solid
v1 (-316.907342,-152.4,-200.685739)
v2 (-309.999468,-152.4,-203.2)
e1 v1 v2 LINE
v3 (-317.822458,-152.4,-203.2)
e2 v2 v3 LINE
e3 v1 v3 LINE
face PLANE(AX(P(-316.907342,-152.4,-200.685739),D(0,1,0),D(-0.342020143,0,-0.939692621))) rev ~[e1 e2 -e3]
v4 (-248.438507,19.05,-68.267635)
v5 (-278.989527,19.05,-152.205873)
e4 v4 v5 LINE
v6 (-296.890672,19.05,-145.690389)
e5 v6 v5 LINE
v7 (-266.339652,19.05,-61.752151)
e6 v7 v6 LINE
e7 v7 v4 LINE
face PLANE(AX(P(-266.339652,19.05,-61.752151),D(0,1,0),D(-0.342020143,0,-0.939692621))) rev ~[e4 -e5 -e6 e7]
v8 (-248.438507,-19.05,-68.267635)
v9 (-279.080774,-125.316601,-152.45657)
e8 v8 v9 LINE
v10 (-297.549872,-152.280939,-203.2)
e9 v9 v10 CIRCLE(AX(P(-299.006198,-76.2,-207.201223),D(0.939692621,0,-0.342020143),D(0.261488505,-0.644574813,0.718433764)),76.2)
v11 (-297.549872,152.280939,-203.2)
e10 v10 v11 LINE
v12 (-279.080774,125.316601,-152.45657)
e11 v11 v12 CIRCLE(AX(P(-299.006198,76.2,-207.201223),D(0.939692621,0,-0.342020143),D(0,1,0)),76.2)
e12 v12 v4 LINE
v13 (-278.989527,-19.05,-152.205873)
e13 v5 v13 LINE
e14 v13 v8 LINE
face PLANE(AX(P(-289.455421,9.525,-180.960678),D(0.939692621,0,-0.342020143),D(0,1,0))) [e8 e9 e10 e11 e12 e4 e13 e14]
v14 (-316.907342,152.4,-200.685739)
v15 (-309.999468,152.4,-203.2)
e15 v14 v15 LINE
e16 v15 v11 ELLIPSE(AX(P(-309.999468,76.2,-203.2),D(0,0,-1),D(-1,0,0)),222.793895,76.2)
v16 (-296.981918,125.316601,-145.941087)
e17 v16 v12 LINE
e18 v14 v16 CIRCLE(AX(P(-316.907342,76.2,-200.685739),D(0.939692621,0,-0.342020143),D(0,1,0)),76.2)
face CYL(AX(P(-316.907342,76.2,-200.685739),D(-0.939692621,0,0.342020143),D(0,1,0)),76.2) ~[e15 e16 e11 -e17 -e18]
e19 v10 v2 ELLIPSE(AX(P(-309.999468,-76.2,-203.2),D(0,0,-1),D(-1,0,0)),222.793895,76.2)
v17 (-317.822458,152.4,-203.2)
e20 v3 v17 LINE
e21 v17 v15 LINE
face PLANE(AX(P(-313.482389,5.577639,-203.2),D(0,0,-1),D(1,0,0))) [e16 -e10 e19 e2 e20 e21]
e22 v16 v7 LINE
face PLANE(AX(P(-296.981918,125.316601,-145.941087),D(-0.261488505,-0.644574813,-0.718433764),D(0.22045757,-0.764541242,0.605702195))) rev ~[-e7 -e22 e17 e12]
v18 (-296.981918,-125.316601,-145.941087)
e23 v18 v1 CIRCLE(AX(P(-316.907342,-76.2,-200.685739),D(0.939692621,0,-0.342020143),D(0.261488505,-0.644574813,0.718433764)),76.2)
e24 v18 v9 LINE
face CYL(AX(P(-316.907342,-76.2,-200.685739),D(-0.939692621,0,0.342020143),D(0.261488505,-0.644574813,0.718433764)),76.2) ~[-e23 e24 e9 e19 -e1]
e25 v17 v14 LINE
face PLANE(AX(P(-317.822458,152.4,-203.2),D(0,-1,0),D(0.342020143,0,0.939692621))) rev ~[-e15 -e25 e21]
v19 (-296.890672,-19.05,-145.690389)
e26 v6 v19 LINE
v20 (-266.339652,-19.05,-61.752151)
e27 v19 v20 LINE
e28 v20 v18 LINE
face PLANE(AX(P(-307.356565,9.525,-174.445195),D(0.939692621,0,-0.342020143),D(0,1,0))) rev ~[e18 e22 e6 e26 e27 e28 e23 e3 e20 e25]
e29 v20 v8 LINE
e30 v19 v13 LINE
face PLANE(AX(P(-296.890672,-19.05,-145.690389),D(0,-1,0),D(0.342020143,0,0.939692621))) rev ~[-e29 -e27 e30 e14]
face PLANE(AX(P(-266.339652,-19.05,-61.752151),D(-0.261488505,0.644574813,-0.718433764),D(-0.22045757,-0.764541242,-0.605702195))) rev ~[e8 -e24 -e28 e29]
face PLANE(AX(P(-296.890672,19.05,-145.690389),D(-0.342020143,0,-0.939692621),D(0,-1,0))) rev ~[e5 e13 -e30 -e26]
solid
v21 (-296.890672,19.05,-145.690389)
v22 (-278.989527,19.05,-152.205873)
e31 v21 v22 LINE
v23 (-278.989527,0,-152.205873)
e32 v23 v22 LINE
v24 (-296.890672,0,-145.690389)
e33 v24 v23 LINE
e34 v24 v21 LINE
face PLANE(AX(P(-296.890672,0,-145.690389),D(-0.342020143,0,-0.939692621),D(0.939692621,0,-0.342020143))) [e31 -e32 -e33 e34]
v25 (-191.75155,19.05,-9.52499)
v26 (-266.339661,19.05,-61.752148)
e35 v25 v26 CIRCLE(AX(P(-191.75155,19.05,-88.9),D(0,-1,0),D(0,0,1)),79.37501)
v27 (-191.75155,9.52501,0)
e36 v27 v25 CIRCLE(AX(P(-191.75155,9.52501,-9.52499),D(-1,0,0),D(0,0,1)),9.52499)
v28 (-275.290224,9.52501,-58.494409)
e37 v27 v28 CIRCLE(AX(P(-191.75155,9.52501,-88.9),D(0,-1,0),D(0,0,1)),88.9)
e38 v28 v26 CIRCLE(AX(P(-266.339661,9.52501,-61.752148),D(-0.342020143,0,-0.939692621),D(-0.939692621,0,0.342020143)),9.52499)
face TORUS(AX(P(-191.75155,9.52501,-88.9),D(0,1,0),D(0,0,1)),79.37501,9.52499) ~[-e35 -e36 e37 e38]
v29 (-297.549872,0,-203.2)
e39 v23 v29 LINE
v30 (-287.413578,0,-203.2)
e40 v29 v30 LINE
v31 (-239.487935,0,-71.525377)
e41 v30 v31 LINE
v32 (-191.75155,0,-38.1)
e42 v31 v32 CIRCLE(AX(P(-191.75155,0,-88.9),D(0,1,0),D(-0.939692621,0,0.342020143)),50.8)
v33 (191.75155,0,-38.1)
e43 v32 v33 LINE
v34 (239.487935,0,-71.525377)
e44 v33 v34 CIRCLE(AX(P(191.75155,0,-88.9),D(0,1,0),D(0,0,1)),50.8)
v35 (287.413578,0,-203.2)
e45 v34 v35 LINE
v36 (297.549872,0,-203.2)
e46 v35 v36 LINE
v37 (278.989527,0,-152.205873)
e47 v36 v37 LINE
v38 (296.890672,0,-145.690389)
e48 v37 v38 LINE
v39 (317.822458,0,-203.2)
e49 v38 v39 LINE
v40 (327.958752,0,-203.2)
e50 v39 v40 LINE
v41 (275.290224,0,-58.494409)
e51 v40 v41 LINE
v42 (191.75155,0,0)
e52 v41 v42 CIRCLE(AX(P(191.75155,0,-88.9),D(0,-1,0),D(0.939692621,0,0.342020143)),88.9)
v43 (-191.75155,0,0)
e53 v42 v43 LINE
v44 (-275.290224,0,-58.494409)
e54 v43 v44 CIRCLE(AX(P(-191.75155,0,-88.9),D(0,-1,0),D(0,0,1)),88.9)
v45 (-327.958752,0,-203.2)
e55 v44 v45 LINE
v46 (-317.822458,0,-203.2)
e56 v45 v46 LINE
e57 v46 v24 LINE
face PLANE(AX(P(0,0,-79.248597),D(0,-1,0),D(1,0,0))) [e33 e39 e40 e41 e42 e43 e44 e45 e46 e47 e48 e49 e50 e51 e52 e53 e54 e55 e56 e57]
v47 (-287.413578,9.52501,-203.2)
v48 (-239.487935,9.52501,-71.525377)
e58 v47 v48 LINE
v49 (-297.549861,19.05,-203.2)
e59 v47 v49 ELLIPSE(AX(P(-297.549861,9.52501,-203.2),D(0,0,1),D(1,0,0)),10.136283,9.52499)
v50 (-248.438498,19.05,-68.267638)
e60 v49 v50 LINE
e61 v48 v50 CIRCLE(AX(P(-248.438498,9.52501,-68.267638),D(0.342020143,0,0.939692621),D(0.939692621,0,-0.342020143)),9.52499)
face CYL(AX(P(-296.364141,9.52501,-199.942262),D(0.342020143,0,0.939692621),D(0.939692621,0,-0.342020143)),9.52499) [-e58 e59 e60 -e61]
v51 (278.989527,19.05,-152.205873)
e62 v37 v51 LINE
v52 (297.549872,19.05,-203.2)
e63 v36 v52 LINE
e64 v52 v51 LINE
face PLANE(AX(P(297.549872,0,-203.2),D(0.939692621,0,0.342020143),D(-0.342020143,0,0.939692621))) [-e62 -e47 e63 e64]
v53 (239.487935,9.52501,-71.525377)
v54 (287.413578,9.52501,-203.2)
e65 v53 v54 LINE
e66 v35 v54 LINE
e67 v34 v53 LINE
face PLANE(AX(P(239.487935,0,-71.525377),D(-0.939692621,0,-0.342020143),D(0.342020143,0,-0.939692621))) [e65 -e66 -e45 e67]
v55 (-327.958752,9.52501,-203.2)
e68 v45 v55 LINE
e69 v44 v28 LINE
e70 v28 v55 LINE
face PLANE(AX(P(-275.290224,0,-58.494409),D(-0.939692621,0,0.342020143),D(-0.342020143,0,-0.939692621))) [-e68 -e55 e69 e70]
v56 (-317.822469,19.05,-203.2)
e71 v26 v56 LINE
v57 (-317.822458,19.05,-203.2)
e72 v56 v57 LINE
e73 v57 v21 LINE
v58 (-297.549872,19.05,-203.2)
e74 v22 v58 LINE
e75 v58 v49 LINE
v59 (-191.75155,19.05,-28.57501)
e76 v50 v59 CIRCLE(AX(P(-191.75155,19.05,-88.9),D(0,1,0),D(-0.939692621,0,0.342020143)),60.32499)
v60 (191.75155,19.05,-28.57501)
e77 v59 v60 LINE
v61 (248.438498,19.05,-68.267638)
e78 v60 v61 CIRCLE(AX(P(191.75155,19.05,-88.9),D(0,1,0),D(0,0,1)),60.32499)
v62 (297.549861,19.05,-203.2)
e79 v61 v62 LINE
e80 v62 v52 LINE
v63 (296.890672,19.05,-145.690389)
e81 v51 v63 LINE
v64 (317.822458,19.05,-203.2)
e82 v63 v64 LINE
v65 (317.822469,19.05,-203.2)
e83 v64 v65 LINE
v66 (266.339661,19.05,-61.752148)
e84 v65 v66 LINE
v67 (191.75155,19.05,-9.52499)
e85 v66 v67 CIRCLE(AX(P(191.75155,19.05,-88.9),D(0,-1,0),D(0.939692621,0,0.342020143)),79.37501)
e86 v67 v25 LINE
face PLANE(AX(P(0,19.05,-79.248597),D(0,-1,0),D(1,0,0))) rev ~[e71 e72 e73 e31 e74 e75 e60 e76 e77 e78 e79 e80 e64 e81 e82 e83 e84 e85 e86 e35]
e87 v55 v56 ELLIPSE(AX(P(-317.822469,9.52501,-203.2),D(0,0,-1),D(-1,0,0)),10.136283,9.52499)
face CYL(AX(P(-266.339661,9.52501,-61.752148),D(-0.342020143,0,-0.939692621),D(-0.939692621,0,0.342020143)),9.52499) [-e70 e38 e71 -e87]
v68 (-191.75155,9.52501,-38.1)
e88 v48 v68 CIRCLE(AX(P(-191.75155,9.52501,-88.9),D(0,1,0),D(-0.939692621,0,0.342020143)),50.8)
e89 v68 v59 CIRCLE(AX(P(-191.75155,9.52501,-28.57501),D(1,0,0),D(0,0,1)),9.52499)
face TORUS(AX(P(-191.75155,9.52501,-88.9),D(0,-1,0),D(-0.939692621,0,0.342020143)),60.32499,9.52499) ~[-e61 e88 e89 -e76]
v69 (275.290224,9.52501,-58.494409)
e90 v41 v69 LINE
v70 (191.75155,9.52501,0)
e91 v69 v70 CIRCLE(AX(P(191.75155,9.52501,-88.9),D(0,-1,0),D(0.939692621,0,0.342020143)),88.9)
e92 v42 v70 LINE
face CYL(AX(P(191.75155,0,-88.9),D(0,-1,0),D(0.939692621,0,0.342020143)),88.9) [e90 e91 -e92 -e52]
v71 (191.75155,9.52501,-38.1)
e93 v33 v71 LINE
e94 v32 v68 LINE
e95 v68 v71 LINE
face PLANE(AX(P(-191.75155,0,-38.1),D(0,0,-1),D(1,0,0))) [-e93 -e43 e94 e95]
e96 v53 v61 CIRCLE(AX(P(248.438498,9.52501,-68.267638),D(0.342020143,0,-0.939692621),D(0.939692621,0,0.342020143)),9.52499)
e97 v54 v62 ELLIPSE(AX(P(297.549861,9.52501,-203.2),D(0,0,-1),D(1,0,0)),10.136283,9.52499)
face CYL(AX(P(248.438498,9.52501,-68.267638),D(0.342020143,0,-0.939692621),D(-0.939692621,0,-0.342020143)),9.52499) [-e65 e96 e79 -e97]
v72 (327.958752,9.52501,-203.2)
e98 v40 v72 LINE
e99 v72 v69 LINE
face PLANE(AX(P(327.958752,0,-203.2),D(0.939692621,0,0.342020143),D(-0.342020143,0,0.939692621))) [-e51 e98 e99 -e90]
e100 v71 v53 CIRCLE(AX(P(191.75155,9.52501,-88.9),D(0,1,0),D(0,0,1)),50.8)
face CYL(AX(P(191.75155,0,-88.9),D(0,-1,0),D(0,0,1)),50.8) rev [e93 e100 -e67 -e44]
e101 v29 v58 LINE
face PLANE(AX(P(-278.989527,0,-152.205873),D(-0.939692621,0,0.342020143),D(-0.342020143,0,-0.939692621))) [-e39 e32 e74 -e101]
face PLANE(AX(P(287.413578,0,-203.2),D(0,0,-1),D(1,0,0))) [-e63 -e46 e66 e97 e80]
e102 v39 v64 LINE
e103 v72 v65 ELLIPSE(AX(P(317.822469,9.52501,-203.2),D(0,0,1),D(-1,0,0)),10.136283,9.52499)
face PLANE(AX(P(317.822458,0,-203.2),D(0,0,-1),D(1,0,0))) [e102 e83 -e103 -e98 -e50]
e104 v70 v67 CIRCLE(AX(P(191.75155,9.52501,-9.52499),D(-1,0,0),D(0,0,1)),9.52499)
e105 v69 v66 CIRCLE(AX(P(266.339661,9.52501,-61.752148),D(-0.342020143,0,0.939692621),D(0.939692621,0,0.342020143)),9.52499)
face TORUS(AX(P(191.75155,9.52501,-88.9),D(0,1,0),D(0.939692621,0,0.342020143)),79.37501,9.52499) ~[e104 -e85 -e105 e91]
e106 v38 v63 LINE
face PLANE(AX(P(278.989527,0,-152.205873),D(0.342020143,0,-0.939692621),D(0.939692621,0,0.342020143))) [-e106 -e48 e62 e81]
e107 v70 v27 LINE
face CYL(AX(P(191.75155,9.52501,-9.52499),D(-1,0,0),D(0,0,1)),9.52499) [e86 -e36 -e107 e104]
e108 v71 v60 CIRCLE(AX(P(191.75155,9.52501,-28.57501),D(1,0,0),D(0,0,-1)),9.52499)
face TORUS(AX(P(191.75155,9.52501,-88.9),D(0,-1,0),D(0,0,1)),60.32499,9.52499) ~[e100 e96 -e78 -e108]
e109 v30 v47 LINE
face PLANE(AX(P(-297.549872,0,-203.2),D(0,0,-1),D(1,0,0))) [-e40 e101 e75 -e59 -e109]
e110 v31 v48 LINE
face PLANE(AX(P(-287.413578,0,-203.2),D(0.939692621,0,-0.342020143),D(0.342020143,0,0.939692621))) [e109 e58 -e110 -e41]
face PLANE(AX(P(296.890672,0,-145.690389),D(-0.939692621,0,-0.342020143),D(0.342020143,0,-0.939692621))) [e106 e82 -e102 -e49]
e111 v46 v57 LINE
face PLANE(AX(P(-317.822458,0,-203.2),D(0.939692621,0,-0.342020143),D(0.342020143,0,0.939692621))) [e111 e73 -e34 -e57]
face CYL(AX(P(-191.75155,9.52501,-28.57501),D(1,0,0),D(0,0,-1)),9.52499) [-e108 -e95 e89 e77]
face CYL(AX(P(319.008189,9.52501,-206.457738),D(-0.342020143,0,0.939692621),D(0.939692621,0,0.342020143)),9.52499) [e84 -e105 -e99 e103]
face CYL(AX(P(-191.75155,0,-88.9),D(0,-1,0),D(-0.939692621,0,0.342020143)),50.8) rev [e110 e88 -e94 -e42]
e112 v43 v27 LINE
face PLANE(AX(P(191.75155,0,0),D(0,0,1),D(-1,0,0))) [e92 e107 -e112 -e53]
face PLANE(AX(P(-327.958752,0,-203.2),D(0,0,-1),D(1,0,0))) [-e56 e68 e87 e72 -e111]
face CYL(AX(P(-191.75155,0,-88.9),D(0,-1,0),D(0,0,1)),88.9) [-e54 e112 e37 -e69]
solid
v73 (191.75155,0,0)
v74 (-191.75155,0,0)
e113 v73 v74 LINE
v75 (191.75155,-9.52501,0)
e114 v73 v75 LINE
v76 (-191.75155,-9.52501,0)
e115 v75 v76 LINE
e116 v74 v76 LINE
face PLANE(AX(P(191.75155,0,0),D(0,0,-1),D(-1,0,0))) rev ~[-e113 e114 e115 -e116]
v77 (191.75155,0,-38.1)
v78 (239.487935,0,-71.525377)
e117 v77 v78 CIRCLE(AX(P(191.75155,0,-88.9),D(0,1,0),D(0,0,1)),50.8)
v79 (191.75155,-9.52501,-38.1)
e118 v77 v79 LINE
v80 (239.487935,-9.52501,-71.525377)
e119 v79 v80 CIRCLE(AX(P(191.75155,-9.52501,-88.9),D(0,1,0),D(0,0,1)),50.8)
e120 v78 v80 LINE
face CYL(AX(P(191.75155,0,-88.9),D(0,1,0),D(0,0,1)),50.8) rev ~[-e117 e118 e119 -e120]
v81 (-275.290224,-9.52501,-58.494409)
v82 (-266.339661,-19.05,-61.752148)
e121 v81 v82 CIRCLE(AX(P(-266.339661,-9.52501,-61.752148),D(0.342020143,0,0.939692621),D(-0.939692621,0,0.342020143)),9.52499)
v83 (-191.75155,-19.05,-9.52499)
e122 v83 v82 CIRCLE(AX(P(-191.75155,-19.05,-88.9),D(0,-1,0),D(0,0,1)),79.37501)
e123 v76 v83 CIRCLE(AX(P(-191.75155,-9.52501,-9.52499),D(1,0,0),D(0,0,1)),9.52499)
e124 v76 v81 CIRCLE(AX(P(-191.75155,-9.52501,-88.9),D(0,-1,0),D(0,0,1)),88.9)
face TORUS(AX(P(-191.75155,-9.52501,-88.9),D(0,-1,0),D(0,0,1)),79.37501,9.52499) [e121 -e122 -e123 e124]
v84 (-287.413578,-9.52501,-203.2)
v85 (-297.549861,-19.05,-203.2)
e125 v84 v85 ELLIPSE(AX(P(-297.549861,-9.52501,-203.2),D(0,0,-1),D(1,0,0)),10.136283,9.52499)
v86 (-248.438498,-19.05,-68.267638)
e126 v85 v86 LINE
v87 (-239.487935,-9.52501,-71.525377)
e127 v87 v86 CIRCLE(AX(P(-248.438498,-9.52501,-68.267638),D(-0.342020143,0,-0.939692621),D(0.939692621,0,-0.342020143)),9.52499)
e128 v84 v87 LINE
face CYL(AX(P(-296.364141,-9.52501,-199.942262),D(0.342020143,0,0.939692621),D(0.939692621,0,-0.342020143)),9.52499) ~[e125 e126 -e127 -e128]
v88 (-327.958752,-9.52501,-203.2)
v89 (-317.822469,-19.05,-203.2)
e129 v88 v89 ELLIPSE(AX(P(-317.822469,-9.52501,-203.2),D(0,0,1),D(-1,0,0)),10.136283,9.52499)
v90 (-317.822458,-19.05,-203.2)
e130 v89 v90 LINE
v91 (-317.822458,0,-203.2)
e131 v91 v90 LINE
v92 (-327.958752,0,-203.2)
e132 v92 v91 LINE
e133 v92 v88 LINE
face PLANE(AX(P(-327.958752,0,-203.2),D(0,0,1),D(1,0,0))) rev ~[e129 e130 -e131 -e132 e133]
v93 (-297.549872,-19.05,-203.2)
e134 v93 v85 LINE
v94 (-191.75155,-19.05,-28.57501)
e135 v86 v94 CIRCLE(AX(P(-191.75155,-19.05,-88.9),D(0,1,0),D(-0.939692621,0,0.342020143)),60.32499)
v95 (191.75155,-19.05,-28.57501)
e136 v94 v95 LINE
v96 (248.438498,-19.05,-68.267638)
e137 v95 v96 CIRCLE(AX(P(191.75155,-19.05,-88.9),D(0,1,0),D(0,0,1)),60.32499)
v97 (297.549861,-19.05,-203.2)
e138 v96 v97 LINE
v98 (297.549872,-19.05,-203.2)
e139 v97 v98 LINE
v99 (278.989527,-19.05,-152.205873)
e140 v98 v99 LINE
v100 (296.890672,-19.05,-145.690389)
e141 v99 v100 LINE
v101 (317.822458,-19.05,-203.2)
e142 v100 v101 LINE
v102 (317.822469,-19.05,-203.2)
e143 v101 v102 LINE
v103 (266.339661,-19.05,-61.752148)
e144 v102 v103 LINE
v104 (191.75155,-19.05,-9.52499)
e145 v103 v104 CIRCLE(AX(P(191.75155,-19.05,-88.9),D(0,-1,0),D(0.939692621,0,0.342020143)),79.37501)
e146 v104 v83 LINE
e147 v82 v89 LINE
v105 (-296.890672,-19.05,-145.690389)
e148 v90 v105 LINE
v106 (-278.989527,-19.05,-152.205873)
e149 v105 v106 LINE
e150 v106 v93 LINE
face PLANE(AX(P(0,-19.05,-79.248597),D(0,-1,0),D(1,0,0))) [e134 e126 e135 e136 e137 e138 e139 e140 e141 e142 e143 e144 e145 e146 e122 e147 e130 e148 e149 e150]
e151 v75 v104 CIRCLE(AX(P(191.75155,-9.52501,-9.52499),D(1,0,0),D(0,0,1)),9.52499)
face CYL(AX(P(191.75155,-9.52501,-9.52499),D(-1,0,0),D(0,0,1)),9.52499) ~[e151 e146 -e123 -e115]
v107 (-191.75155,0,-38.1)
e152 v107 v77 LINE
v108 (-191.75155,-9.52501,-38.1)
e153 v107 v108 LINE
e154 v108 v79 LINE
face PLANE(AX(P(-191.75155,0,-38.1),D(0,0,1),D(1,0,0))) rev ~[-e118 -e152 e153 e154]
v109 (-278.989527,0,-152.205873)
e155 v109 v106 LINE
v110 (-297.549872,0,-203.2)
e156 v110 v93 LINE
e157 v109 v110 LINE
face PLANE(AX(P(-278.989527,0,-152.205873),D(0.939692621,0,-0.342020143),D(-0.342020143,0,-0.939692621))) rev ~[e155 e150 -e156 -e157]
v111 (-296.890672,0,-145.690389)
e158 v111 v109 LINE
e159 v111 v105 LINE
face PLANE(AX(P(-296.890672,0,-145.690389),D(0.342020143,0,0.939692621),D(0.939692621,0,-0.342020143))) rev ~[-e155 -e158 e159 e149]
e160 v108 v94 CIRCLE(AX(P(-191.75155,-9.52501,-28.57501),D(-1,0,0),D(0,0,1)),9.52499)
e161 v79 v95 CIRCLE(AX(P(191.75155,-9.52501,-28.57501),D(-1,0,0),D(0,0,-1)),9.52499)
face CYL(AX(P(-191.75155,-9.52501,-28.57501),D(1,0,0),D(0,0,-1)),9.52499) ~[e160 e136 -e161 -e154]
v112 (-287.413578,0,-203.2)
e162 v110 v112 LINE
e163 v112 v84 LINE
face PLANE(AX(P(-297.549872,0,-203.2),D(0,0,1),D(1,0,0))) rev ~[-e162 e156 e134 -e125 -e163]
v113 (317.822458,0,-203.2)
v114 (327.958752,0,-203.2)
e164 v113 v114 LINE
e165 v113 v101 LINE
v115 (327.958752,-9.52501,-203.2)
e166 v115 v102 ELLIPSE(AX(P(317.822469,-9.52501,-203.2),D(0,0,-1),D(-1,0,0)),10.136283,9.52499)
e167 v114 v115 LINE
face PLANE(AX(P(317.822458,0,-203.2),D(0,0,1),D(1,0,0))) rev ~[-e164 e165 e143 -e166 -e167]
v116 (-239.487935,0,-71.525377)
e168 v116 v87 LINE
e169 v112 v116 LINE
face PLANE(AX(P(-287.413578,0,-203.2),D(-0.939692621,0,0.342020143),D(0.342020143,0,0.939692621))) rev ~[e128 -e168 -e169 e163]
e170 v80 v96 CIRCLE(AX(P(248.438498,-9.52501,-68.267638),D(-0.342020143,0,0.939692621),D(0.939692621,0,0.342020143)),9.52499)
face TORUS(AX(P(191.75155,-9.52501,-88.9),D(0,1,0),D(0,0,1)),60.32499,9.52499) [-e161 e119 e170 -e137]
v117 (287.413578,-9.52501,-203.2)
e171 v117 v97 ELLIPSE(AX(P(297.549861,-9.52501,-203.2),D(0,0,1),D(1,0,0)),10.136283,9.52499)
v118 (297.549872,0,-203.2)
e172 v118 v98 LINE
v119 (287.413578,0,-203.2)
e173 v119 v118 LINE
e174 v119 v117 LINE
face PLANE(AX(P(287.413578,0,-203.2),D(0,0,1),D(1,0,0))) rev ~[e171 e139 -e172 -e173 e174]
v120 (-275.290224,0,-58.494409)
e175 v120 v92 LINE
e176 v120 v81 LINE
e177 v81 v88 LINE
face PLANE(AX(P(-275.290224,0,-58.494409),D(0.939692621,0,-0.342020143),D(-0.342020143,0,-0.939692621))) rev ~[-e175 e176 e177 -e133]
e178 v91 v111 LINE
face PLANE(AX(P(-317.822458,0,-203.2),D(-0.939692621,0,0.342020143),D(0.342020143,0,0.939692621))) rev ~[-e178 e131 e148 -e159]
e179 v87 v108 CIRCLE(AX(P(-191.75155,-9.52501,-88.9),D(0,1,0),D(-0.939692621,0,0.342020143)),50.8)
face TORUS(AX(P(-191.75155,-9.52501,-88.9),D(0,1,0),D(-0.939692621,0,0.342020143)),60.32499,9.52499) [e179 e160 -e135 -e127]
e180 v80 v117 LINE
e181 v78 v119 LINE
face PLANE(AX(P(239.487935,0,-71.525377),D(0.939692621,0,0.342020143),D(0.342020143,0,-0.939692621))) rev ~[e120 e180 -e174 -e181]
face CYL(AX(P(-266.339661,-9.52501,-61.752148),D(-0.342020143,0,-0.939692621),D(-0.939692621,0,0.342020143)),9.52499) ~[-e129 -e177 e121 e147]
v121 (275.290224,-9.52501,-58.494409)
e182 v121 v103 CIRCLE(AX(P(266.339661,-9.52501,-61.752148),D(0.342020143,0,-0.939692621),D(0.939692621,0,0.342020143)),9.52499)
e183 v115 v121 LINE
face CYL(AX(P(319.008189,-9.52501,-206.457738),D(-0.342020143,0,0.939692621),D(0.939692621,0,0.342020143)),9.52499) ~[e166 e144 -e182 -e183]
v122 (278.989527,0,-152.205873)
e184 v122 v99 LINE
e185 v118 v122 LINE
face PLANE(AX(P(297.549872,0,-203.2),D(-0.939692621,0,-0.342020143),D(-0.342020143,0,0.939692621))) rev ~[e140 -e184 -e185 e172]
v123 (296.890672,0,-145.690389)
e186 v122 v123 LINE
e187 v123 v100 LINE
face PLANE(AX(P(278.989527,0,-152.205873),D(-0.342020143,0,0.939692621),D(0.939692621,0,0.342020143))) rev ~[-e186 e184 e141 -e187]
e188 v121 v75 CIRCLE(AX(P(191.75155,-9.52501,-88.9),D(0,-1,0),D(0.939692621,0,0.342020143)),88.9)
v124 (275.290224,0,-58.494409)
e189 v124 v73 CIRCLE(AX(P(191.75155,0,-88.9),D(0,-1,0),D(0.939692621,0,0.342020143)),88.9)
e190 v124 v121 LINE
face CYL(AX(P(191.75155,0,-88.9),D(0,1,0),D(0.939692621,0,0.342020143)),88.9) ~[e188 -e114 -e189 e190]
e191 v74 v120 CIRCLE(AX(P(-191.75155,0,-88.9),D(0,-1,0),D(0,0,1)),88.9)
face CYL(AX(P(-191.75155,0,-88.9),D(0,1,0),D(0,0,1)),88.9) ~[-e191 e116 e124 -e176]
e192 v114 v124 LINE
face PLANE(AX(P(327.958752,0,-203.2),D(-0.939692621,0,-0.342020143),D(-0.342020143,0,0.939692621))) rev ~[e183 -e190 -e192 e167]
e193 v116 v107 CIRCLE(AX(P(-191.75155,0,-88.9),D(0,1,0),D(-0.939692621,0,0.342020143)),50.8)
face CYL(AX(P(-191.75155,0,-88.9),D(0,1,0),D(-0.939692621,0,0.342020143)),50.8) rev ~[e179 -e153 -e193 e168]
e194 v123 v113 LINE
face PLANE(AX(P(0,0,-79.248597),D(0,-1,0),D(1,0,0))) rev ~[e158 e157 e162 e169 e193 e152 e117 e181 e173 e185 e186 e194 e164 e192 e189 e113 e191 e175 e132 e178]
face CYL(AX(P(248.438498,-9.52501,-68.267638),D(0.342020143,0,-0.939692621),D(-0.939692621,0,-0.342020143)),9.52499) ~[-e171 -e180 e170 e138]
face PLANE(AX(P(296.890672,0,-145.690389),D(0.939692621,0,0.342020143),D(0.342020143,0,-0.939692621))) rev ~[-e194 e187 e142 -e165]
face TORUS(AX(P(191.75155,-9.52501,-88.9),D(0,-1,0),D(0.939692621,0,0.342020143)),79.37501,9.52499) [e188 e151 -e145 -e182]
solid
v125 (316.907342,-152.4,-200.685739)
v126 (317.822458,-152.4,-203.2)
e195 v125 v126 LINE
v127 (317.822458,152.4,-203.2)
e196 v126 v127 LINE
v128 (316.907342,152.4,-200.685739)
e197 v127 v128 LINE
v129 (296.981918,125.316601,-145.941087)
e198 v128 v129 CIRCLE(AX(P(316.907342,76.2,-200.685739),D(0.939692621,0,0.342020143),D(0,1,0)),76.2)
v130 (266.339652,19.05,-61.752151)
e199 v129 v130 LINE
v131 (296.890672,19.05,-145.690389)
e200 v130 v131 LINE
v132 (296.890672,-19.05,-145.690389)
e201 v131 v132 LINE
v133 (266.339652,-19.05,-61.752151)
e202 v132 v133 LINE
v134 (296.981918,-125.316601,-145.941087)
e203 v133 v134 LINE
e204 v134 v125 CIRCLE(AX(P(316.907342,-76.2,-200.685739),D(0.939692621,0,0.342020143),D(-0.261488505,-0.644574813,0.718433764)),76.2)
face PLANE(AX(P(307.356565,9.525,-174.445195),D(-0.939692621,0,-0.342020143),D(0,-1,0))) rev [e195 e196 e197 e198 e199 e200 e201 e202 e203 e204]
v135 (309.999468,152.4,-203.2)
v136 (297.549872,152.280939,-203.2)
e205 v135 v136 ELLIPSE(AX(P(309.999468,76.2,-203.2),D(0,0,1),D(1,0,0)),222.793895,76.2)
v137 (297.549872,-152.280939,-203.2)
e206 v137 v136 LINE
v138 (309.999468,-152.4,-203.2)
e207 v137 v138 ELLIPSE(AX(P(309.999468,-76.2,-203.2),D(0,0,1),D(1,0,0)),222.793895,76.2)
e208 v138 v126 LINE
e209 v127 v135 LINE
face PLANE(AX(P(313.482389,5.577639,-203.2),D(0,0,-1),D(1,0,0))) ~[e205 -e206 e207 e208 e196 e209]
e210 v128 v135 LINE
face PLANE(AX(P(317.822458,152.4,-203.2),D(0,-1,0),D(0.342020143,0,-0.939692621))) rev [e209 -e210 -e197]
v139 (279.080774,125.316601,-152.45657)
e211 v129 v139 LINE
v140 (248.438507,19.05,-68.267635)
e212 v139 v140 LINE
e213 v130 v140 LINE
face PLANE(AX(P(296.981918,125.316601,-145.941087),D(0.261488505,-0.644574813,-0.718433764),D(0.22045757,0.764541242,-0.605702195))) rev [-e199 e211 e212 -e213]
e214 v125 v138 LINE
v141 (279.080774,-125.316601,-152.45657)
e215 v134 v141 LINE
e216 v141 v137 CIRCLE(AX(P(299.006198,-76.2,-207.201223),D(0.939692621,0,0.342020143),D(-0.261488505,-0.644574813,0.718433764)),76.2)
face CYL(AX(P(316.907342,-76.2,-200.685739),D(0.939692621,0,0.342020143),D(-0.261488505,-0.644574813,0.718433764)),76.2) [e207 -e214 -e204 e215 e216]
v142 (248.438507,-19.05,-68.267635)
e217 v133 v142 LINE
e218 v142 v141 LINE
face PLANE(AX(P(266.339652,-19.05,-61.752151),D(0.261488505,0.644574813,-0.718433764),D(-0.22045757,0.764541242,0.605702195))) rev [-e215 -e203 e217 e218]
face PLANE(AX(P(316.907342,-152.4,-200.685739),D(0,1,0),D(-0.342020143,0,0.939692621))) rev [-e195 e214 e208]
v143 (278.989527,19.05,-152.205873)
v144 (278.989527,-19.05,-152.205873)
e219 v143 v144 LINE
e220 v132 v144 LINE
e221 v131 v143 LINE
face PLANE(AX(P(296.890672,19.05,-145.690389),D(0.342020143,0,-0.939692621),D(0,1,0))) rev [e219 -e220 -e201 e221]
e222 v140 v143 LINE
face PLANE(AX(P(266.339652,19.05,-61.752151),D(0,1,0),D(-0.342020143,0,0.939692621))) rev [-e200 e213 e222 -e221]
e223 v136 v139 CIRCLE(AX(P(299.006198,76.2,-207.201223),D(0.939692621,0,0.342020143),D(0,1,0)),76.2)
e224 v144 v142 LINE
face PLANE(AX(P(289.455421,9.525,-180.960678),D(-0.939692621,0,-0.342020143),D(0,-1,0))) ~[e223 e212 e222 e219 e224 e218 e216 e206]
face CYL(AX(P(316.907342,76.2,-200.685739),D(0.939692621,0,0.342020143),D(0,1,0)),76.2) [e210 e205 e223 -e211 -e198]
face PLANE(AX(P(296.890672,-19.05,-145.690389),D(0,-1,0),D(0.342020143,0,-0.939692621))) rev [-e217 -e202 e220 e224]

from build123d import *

# Parameters (mm, degrees)
F1_DEPTH = 19.05
F2_DEPTH = 19.05
F3_R     = 9.52499
F3_2_R   = 9.52499
F4_W     = 19.05
F4_H     = 61.2004494442
F5_DEPTH = 19.05
F6_W     = 154.725164175
F6_H     = 323.0141699314
F7_DEPTH = 25.4


# Not quite as in the source:
# - a fillet or chamfer is up to 0.001 mm smaller than in the source, because OpenCascade refuses the exact size


with BuildPart() as f1:
    # F0 (on Front) → F1 (new body)
    with BuildSketch(Plane.XZ):
        with BuildLine():
            Line((191.7515498532, 0), (0, 0))
            Line((0, 0), (-191.7515498532, 0))
            ThreePointArc((-191.7515498532, 0), (-242.7424950448, -16.0773832627), (-275.290223841, -58.4944092583))
            Line((-275.290223841, -58.4944092583), (-327.9587516029, -203.2))
            Line((-327.9587516029, -203.2), (-317.8224583201, -203.2))
            Line((-317.8224583201, -203.2), (-296.8906718296, -145.6903892685))
            Line((-296.8906718296, -145.6903892685), (-278.9895274036, -152.2058729989))
            Line((-278.9895274036, -152.2058729989), (-297.5498717544, -203.2))
            Line((-297.5498717544, -203.2), (-287.4135784716, -203.2))
            Line((-287.4135784716, -203.2), (-239.4879349891, -71.5253767191))
            ThreePointArc((-239.4879349891, -71.5253767191), (-220.8892328198, -47.2870761501), (-191.7515498532, -38.1))
            Line((-191.7515498532, -38.1), (0, -38.1))
            Line((0, -38.1), (191.7515498532, -38.1))
            ThreePointArc((191.7515498532, -38.1), (220.8892328198, -47.2870761501), (239.4879349891, -71.5253767191))
            Line((239.4879349891, -71.5253767191), (287.4135784716, -203.2))
            Line((287.4135784716, -203.2), (297.5498717544, -203.2))
            Line((297.5498717544, -203.2), (278.9895274036, -152.2058729989))
            Line((278.9895274036, -152.2058729989), (296.8906718296, -145.6903892685))
            Line((296.8906718296, -145.6903892685), (317.8224583201, -203.2))
            Line((317.8224583201, -203.2), (327.9587516029, -203.2))
            Line((327.9587516029, -203.2), (275.290223841, -58.4944092583))
            ThreePointArc((275.290223841, -58.4944092583), (242.7424950448, -16.0773832627), (191.7515498532, 0))
        make_face()
    extrude(amount=F1_DEPTH)

    # F3 (radius 9.525 in the source; OpenCascade refuses exactly that, so slightly less here)
    f3_edges = [f1.edges().sort_by_distance(p)[0] for p in [
        (0, -19.05, 0),
        (-242.742495, -19.05, -16.077383),
        (0, -19.05, -38.1),
        (-220.889233, -19.05, -47.287076),
        (220.889233, -19.05, -47.287076),
        (242.742495, -19.05, -16.077383),
    ]]
    fillet(f3_edges, radius=F3_R)


with BuildPart() as f2:
    # F0 (on Front) → F2 (new body)
    with BuildSketch(Plane.XZ):
        with BuildLine():
            Line((191.7515498532, 0), (0, 0))
            Line((0, 0), (-191.7515498532, 0))
            ThreePointArc((-191.7515498532, 0), (-242.7424950448, -16.0773832627), (-275.290223841, -58.4944092583))
            Line((-275.290223841, -58.4944092583), (-327.9587516029, -203.2))
            Line((-327.9587516029, -203.2), (-317.8224583201, -203.2))
            Line((-317.8224583201, -203.2), (-296.8906718296, -145.6903892685))
            Line((-296.8906718296, -145.6903892685), (-278.9895274036, -152.2058729989))
            Line((-278.9895274036, -152.2058729989), (-297.5498717544, -203.2))
            Line((-297.5498717544, -203.2), (-287.4135784716, -203.2))
            Line((-287.4135784716, -203.2), (-239.4879349891, -71.5253767191))
            ThreePointArc((-239.4879349891, -71.5253767191), (-220.8892328198, -47.2870761501), (-191.7515498532, -38.1))
            Line((-191.7515498532, -38.1), (0, -38.1))
            Line((0, -38.1), (191.7515498532, -38.1))
            ThreePointArc((191.7515498532, -38.1), (220.8892328198, -47.2870761501), (239.4879349891, -71.5253767191))
            Line((239.4879349891, -71.5253767191), (287.4135784716, -203.2))
            Line((287.4135784716, -203.2), (297.5498717544, -203.2))
            Line((297.5498717544, -203.2), (278.9895274036, -152.2058729989))
            Line((278.9895274036, -152.2058729989), (296.8906718296, -145.6903892685))
            Line((296.8906718296, -145.6903892685), (317.8224583201, -203.2))
            Line((317.8224583201, -203.2), (327.9587516029, -203.2))
            Line((327.9587516029, -203.2), (275.290223841, -58.4944092583))
            ThreePointArc((275.290223841, -58.4944092583), (242.7424950448, -16.0773832627), (191.7515498532, 0))
        make_face()
    extrude(amount=-F2_DEPTH)

    # F3#2 (radius 9.525 in the source; OpenCascade refuses exactly that, so slightly less here)
    f3_2_edges = [f2.edges().sort_by_distance(p)[0] for p in [
        (-242.742495, 19.05, -16.077383),
        (0, 19.05, 0),
        (242.742495, 19.05, -16.077383),
        (220.889233, 19.05, -47.287076),
        (0, 19.05, -38.1),
    ]]
    fillet(f3_2_edges, radius=F3_2_R)


with BuildPart() as f5:
    # F4 (on face) → F5 (new body)
    with BuildSketch(Plane(origin=(-215.3370720631, 0, 78.376284565), x_dir=(0, 1, 0), z_dir=(0.9396926208, 0, -0.3420201433))):
        with Locations((9.525, -269.0469985684)):
            Rectangle(F4_W, F4_H)
        with Locations((-9.525, -269.0469985684)):
            Rectangle(F4_W, F4_H)
        with BuildLine():
            Line((-152.4, -296.9716030201), (-152.4, -299.6472232904))
            Line((-152.4, -299.6472232904), (-19.05, -299.6472232904))
            Line((-19.05, -299.6472232904), (-19.05, -238.4467738463))
            Line((-19.05, -238.4467738463), (-19.05, -149.1215665516))
            Line((-19.05, -149.1215665516), (-125.3166007179, -238.7135603657))
            ThreePointArc((-125.3166007179, -238.7135603657), (-145.2982090025, -264.8487527006), (-152.4, -296.9716030201))
        make_face()
        with BuildLine():
            Line((19.05, -238.4467738463), (19.05, -299.6472232904))
            Line((19.05, -299.6472232904), (152.4, -299.6472232904))
            Line((152.4, -299.6472232904), (152.4, -296.9716030201))
            ThreePointArc((152.4, -296.9716030201), (145.2982090025, -264.8487527006), (125.3166007179, -238.7135603657))
            Line((125.3166007179, -238.7135603657), (19.05, -149.1215665516))
            Line((19.05, -149.1215665516), (19.05, -238.4467738463))
        make_face()
    extrude(amount=F5_DEPTH)

    # F6 (on face) → F7 (cut)
    with BuildSketch(Plane(origin=(0, 0, -203.2), x_dir=(1, 0, 0), z_dir=(0, 0, -1))):
        with Locations((-313.482388854, -5.5776387453)):
            Rectangle(F6_W, F6_H)
    extrude(amount=F7_DEPTH, mode=Mode.SUBTRACT)


with BuildPart() as f8_1:
    # F8: instance of F5
    add(f5.part.mirror(Plane.YZ))


solid = Compound([f1.part, f2.part, f5.part, f8_1.part])
